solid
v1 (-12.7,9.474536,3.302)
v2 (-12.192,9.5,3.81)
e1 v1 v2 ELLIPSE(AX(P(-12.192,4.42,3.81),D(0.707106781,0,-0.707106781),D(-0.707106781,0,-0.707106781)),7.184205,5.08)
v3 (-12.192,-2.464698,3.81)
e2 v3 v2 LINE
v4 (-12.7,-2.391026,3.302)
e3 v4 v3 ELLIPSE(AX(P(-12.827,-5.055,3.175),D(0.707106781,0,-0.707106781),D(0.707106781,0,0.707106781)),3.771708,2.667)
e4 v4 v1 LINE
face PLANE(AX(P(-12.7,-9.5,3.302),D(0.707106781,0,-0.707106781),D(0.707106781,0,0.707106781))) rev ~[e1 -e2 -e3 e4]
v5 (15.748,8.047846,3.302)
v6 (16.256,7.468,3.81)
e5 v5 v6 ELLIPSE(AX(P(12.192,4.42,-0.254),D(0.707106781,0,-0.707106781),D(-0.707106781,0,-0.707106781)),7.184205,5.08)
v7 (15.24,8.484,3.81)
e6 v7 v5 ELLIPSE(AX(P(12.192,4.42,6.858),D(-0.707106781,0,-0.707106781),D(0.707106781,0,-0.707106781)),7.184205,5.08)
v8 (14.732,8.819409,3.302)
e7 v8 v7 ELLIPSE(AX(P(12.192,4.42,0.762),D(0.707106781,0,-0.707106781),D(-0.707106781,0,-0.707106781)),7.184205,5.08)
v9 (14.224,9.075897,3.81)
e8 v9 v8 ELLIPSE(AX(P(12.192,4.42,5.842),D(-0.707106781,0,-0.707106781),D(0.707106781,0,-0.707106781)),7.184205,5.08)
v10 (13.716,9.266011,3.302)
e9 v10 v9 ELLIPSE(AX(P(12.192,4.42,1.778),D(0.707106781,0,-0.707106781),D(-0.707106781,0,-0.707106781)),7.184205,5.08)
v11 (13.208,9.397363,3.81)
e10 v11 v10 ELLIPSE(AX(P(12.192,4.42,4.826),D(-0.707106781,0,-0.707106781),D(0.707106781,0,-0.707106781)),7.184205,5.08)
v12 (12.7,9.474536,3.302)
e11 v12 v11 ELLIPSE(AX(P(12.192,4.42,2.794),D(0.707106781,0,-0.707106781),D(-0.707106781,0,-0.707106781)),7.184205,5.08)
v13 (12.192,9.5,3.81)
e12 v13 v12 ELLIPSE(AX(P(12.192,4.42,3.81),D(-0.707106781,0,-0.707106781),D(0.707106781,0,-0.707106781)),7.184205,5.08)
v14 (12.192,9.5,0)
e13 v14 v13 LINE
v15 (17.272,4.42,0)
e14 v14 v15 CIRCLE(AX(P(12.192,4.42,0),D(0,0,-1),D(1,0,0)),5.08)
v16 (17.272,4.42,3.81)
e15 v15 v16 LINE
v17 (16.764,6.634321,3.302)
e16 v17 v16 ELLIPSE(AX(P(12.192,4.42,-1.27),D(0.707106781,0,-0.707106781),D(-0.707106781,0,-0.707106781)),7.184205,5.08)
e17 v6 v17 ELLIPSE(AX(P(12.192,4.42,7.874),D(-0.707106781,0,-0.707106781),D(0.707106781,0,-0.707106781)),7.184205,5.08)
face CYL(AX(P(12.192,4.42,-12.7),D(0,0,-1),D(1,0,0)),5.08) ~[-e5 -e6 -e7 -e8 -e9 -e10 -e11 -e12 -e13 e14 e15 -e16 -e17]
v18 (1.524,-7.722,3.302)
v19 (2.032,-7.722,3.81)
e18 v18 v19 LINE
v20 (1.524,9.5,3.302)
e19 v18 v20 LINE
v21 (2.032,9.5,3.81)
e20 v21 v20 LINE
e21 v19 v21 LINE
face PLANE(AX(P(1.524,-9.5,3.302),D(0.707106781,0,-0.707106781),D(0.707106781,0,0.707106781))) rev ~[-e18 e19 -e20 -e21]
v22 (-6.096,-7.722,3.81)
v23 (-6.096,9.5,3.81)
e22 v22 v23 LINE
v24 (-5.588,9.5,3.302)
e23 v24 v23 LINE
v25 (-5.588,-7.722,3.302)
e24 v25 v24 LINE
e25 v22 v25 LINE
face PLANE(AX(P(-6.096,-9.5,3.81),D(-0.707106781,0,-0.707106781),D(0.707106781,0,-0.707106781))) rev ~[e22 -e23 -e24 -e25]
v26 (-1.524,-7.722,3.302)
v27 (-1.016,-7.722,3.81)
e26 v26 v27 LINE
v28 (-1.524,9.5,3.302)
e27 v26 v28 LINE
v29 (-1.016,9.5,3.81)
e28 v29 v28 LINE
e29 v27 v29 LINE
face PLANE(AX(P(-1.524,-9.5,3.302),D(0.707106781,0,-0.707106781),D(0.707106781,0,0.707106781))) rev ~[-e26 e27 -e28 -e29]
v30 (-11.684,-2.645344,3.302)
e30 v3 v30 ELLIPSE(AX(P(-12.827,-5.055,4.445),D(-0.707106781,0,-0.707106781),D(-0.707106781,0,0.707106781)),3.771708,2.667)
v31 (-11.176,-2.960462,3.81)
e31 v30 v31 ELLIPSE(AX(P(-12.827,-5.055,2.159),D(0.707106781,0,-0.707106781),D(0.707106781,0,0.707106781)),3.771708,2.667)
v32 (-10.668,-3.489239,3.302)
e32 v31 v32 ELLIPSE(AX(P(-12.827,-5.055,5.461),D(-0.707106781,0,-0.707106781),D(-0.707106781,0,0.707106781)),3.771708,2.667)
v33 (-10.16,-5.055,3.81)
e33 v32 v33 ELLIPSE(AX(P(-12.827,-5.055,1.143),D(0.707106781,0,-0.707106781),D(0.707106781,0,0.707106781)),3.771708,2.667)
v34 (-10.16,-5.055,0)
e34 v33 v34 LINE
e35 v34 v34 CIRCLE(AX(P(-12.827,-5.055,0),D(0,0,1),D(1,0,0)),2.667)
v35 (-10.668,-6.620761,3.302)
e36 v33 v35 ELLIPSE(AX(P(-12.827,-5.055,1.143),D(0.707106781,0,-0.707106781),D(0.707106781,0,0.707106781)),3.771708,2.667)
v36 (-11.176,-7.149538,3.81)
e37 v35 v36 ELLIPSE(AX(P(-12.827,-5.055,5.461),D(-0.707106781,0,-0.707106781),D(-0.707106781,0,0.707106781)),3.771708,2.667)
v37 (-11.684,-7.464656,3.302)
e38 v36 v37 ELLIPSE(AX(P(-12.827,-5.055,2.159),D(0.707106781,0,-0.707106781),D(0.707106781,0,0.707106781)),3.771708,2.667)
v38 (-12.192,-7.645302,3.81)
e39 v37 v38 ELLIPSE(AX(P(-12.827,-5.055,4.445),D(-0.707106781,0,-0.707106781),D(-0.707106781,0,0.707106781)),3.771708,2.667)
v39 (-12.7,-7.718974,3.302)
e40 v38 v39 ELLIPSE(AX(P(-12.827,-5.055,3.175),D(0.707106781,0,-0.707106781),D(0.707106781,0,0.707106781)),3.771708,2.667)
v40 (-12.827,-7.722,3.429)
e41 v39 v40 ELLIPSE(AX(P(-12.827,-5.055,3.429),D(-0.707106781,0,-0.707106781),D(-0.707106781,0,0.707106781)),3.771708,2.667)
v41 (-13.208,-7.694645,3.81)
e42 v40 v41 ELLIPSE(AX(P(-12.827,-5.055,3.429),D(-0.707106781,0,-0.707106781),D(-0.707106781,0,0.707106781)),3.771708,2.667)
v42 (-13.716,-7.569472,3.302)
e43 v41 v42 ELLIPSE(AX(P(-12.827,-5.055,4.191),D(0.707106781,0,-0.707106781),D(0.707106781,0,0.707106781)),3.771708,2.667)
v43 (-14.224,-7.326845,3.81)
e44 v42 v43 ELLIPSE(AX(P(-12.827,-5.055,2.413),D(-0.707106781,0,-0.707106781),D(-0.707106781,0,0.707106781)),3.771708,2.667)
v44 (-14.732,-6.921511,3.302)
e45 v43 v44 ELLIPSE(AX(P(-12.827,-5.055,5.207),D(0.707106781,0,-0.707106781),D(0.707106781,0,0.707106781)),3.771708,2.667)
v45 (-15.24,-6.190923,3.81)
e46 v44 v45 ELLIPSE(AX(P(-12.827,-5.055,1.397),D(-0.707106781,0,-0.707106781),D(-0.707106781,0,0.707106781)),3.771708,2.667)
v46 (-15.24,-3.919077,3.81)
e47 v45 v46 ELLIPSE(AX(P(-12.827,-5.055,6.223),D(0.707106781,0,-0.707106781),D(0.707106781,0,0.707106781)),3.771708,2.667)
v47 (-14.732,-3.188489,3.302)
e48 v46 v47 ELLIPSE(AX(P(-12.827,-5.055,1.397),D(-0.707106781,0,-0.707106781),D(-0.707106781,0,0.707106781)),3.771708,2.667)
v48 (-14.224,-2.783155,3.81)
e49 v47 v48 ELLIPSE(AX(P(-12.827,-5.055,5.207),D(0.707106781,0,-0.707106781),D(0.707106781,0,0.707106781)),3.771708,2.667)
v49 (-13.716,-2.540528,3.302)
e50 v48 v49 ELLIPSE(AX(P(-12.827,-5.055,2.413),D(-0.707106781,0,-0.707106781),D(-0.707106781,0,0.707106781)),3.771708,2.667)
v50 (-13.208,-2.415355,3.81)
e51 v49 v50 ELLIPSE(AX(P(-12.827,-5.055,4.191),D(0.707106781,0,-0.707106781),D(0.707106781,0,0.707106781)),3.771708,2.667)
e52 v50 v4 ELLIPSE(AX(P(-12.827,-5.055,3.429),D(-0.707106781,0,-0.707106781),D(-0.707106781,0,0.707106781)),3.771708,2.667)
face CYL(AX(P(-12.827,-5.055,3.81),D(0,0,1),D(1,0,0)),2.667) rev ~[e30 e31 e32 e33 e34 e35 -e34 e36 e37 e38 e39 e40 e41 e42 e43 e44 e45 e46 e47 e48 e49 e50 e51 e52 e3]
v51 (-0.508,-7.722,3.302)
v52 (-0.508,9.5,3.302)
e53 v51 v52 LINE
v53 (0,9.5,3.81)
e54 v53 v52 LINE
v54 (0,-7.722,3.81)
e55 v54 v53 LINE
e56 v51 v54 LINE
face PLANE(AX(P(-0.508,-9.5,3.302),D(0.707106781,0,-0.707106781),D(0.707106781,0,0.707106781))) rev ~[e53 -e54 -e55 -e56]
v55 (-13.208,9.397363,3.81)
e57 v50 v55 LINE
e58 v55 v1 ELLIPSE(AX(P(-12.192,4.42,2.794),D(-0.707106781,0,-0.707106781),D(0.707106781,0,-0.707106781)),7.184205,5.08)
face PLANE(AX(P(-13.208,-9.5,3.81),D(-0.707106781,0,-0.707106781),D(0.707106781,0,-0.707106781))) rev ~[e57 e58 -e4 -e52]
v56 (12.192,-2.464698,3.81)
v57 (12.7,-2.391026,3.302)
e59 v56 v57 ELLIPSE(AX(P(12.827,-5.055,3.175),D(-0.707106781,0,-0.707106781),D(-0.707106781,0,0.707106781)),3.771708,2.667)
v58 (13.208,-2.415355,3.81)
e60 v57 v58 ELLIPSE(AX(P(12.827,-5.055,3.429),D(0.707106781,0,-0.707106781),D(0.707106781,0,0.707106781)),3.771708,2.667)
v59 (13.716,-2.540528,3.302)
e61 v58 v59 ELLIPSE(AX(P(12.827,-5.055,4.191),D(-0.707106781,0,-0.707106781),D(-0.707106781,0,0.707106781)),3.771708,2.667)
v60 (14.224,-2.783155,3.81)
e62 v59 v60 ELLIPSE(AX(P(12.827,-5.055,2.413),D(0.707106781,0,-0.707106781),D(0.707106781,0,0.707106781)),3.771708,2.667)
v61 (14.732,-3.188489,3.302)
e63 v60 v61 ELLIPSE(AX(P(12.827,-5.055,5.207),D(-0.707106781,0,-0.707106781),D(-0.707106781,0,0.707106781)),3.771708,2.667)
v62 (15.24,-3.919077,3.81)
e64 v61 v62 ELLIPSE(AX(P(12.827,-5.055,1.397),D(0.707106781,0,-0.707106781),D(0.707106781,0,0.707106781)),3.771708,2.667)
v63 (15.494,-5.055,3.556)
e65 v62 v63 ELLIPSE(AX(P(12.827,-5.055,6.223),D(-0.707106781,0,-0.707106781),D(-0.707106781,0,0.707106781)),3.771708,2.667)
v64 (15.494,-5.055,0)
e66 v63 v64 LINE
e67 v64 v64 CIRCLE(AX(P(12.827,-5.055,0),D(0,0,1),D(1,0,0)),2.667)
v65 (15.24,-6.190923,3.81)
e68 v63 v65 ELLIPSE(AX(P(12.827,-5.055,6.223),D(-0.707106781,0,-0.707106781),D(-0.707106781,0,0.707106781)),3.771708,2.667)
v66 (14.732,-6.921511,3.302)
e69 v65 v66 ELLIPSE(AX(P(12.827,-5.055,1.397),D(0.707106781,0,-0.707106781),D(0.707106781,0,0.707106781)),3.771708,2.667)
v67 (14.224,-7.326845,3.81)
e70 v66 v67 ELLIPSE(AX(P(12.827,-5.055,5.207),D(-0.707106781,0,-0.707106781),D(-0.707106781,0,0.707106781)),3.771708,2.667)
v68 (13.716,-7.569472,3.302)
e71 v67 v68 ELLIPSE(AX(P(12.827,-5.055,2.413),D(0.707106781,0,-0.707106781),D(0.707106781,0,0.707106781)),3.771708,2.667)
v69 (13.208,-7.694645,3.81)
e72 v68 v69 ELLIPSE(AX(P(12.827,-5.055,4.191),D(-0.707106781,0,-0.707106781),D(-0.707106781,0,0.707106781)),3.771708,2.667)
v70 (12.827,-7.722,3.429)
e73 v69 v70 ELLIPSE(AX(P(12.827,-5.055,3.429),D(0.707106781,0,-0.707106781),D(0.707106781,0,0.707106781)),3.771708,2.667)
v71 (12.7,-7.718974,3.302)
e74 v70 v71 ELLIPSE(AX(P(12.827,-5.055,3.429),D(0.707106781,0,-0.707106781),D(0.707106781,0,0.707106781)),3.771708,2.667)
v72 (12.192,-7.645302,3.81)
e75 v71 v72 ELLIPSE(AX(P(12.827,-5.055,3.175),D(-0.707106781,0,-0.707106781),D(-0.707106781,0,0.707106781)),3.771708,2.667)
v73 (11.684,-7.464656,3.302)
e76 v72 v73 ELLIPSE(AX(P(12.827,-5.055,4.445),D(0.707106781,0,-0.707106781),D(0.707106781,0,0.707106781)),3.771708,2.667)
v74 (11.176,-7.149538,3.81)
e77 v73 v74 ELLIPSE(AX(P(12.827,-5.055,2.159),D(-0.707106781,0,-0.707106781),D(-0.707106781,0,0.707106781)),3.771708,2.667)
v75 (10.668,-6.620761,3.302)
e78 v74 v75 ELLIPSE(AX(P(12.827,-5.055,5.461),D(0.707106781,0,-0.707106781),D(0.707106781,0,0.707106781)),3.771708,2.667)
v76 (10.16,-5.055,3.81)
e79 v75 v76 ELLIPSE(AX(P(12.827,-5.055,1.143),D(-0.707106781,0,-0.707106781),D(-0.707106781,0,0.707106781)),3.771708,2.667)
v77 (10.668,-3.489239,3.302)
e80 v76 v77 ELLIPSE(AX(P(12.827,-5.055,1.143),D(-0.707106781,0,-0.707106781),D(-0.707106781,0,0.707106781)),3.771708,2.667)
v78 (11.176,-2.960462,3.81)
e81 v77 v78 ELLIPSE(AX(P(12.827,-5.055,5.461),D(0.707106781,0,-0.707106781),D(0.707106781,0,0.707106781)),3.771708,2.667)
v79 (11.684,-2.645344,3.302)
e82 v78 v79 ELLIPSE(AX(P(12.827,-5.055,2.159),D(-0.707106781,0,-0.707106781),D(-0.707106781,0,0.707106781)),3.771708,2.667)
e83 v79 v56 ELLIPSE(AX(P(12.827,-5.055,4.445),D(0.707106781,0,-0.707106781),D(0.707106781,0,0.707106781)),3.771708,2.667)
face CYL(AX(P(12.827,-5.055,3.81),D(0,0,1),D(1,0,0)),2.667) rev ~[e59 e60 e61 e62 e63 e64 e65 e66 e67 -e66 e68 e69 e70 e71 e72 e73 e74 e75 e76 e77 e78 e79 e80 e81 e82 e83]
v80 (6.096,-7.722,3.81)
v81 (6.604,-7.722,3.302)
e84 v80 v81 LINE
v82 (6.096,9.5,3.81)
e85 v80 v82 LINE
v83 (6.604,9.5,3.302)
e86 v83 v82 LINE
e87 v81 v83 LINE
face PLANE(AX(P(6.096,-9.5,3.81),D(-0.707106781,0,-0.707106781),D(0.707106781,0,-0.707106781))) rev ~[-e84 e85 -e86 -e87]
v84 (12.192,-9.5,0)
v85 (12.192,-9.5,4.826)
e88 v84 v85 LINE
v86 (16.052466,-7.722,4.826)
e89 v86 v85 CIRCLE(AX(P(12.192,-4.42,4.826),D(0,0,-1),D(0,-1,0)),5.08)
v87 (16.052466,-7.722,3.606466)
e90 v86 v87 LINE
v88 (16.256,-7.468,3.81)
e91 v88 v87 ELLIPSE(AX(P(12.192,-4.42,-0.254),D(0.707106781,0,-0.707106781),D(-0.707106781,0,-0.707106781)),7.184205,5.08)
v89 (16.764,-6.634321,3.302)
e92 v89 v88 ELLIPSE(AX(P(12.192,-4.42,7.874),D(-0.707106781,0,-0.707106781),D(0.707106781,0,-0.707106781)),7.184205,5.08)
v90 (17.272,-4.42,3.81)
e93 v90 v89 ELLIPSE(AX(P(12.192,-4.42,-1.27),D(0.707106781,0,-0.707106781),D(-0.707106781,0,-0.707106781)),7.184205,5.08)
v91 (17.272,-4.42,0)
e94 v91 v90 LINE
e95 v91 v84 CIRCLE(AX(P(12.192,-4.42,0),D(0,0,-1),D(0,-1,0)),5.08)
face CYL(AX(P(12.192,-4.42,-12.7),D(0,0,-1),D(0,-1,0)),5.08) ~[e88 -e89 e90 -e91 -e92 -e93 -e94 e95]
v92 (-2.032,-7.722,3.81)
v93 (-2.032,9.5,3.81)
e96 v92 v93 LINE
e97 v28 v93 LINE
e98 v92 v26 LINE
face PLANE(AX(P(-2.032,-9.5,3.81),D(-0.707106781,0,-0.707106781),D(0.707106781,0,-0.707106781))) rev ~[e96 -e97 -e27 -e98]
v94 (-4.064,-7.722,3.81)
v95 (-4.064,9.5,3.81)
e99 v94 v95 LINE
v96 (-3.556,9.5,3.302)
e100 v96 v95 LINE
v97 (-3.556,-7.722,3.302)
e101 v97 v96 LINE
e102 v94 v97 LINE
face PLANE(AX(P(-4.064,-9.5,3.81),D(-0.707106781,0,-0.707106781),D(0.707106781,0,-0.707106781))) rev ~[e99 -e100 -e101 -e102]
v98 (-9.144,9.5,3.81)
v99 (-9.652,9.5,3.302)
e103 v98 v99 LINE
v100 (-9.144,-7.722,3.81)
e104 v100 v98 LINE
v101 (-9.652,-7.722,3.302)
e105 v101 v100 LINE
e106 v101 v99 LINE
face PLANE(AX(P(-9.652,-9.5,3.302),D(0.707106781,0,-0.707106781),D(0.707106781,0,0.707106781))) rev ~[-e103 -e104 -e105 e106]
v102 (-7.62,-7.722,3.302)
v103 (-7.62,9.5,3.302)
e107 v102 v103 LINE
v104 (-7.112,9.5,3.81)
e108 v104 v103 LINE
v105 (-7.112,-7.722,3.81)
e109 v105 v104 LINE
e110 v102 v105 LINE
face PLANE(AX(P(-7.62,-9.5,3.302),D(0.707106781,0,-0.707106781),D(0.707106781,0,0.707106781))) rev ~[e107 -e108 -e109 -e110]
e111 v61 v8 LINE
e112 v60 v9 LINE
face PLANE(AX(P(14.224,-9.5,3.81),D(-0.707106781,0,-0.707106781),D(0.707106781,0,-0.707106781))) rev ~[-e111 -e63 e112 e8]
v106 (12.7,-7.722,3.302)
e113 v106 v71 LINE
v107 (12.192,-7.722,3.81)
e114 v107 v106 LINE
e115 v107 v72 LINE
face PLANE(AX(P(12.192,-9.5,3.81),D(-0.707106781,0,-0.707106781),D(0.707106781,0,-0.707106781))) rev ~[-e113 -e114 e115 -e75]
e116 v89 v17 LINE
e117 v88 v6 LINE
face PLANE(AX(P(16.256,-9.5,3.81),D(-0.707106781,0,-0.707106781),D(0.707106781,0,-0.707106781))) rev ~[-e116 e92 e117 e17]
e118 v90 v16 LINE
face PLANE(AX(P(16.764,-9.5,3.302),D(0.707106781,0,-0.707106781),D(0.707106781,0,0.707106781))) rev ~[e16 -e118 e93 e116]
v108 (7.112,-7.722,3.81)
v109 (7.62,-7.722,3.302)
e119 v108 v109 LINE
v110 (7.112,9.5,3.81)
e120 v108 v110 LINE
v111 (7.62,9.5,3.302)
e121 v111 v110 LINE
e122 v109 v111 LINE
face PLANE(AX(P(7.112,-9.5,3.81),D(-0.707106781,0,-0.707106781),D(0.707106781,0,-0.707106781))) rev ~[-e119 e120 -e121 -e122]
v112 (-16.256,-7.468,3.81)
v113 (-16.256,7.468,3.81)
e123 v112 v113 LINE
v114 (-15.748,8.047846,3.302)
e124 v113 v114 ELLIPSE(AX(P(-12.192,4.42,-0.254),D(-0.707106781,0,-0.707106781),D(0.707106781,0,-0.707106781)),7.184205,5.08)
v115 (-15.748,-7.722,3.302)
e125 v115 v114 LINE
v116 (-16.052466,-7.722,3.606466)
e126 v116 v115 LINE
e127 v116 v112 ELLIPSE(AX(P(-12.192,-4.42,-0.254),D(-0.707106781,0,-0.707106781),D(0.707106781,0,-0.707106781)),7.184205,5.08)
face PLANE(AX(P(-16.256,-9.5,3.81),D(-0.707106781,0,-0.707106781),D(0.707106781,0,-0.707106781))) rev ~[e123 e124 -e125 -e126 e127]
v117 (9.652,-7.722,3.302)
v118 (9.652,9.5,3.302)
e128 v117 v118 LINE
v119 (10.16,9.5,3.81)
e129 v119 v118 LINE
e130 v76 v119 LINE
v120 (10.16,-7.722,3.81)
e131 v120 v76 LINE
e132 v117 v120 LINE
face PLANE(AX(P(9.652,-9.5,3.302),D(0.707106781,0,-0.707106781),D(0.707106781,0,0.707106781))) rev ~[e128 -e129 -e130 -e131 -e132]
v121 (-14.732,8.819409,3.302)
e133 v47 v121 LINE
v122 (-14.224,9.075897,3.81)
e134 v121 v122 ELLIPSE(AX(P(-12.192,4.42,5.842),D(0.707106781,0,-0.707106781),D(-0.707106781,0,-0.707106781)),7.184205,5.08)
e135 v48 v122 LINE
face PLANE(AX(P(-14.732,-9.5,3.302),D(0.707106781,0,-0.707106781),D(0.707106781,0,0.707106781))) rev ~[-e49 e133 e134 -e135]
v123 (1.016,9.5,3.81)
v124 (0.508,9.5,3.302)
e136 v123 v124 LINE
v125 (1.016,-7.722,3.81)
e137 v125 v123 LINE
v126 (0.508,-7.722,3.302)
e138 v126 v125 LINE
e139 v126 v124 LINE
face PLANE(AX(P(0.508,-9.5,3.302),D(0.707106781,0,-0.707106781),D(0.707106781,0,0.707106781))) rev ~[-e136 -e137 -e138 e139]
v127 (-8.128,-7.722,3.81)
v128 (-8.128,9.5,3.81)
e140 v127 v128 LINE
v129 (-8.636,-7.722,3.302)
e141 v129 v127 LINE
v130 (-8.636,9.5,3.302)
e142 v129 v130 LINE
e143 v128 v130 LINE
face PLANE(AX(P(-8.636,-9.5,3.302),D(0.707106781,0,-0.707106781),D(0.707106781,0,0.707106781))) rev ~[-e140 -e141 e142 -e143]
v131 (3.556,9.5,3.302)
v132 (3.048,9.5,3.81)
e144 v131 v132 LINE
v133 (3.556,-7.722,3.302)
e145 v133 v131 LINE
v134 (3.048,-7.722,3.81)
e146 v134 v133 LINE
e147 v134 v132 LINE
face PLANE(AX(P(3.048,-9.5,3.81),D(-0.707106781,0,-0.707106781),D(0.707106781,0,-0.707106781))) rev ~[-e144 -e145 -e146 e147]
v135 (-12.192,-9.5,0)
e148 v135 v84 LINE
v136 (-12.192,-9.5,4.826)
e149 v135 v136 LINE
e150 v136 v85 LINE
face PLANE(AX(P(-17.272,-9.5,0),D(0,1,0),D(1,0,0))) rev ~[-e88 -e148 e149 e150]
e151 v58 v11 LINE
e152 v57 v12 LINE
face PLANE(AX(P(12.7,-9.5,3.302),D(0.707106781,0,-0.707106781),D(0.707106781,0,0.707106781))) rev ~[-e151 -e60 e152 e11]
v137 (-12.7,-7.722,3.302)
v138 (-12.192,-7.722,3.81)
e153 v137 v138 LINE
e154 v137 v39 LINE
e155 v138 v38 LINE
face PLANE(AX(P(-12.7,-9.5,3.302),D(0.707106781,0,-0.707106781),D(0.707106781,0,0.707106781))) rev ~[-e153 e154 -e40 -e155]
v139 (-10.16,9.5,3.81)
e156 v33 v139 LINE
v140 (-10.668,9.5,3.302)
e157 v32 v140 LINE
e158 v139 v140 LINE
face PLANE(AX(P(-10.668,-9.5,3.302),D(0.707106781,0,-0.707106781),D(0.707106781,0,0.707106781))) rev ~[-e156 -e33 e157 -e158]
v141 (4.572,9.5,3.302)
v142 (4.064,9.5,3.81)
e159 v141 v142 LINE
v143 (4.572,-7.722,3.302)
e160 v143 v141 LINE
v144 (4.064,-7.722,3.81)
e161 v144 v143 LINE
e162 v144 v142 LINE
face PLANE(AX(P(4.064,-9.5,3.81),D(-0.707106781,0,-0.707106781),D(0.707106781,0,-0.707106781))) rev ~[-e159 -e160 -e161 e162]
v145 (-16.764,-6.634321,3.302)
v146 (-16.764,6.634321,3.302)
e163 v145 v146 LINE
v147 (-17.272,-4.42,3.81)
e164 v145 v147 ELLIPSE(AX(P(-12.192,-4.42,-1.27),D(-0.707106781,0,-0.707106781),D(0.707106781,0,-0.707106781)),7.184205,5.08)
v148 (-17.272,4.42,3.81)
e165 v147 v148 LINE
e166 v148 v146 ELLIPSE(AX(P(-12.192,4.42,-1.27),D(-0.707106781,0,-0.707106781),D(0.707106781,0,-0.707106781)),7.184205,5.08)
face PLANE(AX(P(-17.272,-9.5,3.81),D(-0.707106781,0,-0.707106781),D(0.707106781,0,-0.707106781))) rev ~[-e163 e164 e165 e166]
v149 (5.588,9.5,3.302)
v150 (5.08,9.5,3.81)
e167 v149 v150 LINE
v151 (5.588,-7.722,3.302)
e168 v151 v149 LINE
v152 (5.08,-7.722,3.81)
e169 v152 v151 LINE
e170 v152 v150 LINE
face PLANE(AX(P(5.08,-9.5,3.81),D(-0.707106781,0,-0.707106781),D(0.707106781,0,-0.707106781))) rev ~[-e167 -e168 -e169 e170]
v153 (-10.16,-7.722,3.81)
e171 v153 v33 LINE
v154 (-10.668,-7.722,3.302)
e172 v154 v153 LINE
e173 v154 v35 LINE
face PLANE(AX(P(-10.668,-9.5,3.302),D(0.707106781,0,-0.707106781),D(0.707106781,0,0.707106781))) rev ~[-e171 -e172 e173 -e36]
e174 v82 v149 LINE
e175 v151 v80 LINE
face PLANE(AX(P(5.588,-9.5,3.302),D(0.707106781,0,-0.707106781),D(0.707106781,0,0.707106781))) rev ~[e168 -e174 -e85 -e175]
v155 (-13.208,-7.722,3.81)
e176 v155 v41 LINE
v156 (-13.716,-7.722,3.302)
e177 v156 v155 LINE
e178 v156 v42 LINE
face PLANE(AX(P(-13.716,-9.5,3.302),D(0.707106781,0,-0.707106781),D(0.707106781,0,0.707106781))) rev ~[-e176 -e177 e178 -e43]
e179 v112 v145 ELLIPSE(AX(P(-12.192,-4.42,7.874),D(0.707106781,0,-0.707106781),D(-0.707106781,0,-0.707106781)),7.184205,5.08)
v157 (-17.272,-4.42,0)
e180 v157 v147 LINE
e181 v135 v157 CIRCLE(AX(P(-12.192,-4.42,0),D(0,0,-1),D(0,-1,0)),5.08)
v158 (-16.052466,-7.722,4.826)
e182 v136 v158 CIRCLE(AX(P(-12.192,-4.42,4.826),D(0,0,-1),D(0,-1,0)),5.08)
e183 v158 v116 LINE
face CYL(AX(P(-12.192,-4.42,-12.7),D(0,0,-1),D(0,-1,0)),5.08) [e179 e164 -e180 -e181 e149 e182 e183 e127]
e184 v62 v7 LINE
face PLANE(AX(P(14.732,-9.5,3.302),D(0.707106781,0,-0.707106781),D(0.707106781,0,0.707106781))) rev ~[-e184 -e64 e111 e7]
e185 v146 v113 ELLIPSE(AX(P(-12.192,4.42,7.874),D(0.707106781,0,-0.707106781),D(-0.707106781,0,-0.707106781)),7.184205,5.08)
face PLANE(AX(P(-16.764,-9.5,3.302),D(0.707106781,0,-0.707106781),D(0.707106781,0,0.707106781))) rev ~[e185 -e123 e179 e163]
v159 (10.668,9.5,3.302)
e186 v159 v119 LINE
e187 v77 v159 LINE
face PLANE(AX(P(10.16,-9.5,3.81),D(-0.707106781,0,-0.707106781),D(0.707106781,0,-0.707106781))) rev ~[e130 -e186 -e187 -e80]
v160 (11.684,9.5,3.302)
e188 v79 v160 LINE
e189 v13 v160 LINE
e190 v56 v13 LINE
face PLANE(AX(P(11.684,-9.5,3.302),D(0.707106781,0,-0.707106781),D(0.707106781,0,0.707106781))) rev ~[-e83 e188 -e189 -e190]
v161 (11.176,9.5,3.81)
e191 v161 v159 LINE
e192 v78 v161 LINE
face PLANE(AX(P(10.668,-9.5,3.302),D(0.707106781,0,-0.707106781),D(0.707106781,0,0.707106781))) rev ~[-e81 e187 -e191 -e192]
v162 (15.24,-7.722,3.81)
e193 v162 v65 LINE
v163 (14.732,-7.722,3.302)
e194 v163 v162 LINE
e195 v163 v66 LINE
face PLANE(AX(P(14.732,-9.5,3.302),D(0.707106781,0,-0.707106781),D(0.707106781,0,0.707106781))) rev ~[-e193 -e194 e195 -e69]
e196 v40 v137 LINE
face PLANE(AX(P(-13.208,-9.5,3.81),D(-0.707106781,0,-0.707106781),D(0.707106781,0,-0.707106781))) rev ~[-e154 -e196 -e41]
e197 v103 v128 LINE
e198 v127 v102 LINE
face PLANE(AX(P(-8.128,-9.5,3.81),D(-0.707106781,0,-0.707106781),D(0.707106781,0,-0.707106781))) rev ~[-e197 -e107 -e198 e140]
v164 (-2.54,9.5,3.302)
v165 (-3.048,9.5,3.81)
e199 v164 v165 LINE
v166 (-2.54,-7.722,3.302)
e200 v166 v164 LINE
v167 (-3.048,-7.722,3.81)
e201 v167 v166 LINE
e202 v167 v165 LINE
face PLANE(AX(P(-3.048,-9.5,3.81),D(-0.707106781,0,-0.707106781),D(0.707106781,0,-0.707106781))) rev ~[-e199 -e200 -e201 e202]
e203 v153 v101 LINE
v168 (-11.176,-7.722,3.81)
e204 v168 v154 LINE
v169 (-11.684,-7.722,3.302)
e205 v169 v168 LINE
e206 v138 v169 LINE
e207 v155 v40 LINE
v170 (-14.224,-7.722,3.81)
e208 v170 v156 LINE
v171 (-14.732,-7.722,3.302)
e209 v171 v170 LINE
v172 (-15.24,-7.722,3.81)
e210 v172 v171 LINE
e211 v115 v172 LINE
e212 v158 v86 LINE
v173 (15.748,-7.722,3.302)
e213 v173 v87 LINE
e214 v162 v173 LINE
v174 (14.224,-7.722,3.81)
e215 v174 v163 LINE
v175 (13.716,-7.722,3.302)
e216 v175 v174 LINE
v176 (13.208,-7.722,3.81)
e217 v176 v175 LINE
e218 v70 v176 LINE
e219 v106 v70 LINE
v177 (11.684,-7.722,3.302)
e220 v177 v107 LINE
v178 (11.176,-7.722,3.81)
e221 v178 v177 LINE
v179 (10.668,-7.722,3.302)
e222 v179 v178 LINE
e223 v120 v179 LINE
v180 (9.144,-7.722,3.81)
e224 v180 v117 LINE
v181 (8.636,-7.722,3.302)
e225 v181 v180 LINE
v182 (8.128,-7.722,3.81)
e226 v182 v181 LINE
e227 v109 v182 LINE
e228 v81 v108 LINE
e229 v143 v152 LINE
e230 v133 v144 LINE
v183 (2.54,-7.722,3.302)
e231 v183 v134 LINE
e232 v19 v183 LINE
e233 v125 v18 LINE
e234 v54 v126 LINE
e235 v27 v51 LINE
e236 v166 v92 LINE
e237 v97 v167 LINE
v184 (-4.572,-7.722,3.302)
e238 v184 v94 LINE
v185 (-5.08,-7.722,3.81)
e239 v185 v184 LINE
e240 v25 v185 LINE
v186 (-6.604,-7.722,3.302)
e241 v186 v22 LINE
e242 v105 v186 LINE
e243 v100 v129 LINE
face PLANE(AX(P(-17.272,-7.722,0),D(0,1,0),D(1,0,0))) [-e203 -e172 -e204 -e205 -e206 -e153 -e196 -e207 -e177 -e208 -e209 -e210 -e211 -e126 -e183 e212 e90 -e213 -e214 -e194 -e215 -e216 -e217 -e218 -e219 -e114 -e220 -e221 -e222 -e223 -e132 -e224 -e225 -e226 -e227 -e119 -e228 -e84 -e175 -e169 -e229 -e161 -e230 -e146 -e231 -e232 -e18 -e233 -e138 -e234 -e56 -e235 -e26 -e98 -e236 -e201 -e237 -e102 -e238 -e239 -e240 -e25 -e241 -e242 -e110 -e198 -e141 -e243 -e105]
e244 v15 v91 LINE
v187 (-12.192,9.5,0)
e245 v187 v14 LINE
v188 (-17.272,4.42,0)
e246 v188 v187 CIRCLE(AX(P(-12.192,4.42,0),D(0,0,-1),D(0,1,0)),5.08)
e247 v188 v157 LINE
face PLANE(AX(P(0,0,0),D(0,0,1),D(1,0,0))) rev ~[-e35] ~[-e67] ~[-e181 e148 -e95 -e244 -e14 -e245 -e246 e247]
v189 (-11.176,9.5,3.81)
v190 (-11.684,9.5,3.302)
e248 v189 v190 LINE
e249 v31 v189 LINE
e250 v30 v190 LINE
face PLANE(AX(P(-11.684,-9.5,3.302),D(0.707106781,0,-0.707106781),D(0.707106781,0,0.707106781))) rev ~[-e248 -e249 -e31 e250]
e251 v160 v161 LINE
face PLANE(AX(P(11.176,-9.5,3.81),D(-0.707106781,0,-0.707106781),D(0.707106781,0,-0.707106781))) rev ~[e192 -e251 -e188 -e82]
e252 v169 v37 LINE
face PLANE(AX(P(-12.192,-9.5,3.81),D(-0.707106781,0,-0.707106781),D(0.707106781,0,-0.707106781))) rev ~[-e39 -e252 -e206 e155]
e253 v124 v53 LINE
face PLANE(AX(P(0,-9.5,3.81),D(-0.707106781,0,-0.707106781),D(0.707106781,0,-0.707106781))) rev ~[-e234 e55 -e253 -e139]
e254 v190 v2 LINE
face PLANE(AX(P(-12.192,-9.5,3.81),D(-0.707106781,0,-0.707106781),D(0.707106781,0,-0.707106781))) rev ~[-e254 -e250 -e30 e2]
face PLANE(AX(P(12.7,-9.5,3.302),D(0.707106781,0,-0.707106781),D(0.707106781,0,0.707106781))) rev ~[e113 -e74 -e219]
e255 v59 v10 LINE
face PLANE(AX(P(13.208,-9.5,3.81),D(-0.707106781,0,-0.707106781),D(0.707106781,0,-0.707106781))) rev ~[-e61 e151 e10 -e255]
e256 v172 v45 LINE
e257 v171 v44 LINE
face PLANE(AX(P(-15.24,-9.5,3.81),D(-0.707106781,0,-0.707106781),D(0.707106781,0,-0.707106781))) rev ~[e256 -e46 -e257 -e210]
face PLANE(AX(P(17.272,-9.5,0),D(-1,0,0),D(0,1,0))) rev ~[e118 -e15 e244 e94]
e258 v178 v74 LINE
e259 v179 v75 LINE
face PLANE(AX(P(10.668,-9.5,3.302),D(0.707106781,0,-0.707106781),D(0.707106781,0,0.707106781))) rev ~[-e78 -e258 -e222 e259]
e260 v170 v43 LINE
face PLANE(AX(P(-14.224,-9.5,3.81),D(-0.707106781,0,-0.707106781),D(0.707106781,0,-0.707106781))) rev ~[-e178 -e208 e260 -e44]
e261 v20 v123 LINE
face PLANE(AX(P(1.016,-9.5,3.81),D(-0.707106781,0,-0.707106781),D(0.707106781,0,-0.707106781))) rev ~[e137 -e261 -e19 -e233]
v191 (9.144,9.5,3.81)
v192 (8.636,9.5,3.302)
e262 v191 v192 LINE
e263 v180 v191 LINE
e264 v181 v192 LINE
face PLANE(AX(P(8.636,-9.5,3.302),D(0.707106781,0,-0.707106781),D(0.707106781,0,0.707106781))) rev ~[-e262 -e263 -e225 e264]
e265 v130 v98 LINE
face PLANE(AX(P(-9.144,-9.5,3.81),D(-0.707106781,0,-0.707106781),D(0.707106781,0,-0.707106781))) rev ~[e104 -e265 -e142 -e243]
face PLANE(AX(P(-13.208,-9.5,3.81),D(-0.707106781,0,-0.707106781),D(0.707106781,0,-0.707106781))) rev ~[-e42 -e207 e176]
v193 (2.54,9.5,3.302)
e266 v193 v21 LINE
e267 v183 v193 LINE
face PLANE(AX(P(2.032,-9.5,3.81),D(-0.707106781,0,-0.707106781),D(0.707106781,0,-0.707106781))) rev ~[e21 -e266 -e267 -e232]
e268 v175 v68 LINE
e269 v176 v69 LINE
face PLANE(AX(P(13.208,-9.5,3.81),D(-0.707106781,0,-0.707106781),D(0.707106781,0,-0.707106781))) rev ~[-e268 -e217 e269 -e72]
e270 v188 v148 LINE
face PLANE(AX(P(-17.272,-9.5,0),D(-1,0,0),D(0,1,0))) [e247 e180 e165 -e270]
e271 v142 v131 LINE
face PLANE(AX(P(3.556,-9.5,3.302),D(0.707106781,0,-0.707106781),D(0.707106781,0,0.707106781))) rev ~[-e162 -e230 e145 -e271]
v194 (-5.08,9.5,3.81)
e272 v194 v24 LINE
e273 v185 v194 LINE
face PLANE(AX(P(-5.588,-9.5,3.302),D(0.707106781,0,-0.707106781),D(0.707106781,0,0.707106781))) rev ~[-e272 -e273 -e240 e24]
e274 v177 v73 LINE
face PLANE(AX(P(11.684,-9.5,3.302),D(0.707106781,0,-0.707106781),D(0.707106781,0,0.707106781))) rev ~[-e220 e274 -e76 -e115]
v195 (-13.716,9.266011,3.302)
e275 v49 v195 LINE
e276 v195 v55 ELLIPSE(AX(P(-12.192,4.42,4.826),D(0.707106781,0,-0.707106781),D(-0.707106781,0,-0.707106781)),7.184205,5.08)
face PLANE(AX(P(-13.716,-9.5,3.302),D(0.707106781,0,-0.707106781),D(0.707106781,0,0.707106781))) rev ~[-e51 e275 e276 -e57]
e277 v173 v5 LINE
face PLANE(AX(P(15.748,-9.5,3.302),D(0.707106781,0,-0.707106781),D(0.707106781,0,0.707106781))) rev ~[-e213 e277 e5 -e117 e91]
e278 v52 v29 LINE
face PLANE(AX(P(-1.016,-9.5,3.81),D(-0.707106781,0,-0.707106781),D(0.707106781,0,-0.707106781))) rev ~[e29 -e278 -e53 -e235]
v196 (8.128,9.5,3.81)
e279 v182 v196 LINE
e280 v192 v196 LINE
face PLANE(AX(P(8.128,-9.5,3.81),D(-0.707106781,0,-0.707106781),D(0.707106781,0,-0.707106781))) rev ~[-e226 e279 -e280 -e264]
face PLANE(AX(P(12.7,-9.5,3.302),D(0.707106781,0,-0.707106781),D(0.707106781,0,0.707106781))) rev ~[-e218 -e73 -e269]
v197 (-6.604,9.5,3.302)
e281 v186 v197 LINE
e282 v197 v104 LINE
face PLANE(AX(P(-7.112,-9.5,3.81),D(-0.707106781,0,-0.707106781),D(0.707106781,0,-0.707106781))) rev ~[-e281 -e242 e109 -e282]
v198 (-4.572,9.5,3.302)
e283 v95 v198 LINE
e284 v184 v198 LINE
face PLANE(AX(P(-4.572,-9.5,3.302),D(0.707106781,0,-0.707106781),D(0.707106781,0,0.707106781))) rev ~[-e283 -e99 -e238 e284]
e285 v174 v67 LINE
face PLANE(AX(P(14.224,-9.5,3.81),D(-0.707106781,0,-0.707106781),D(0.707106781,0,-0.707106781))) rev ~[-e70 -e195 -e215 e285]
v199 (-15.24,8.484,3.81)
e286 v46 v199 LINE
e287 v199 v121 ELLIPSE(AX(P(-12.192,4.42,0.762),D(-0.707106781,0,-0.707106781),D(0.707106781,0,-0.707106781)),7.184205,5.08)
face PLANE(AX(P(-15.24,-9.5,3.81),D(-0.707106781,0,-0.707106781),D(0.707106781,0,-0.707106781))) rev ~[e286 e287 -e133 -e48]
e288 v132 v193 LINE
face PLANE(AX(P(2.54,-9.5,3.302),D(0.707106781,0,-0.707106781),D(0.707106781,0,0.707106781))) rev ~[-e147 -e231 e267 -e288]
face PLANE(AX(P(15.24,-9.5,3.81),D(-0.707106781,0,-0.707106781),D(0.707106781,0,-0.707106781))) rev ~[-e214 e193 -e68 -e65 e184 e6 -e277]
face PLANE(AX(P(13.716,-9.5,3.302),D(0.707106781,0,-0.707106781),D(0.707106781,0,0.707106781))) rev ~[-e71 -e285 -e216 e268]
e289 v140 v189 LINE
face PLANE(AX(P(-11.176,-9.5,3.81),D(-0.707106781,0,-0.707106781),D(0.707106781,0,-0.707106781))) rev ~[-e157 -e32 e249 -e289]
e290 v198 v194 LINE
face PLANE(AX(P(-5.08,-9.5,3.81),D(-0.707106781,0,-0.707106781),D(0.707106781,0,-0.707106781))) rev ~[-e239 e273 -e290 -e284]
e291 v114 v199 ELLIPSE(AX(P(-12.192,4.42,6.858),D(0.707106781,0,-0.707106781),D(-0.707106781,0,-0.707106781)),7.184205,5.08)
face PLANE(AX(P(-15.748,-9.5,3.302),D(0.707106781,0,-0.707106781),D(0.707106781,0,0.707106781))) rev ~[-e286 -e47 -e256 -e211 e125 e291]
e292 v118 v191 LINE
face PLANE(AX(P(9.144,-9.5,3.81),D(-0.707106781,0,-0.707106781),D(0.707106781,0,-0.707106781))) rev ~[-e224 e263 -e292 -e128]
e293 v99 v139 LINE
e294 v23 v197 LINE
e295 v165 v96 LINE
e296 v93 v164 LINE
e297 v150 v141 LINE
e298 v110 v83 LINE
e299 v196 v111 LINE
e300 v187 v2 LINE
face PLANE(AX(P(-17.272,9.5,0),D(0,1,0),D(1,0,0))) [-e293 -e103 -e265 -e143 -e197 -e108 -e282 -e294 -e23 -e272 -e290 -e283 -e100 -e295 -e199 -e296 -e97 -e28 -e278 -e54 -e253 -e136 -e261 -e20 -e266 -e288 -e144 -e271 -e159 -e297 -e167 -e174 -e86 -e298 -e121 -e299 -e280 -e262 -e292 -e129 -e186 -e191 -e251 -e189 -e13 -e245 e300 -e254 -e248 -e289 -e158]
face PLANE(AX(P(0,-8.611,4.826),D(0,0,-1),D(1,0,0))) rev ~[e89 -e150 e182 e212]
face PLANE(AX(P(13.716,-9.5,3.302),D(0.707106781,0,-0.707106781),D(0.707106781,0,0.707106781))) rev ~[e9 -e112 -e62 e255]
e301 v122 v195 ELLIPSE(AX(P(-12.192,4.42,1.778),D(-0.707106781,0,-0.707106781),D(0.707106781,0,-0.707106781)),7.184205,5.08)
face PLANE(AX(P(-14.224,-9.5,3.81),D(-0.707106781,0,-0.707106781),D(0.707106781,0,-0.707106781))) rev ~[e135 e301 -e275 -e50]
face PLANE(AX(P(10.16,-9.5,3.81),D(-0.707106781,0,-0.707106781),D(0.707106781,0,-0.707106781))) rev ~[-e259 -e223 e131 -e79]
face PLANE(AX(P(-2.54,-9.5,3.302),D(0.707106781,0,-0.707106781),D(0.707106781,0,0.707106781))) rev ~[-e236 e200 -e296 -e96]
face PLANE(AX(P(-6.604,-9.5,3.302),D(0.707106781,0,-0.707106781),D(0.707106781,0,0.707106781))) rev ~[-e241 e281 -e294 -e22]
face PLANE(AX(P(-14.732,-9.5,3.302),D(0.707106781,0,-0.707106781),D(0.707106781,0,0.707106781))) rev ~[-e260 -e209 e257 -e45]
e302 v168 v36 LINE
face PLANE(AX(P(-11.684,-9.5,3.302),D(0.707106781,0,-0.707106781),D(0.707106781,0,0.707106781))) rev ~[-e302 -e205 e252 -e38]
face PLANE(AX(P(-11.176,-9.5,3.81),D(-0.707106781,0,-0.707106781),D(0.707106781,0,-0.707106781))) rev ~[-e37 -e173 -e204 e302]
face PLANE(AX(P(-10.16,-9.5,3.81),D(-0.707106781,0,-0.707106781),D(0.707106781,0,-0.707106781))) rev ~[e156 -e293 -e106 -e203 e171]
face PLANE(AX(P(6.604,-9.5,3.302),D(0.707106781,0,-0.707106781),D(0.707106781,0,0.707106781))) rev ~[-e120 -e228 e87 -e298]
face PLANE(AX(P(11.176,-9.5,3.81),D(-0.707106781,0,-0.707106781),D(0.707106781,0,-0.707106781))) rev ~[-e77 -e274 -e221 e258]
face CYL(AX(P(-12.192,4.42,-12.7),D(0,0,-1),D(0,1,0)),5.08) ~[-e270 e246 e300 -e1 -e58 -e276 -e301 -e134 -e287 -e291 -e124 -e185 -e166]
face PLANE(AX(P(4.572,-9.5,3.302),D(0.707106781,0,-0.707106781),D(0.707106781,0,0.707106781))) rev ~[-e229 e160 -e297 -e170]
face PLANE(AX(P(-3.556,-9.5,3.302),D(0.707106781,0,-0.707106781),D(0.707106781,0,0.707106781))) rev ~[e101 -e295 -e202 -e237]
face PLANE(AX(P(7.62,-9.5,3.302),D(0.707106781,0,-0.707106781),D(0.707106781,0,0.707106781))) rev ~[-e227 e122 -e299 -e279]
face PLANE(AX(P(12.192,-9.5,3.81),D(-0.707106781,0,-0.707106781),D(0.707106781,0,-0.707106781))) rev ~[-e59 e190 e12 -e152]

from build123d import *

# Parameters (mm, degrees)
F0_W        = 34.544
F0_H        = 19
F1_DEPTH    = 3.81
F3_R        = 2.667
F4_DEPTH    = 10.16
F6_DEPTH    = 19.001
F7_W        = 34.544
F7_H        = 1.778
F8_DEPTH    = 4.826
F9_T1_DEPTH = 30.226
F9_T3_DEPTH = 29.21


# Not quite as in the source:
# - a fillet or chamfer that OpenCascade refuses, or shapes differently, is made with other operations: its cross-section is extruded or revolved along the edge and cut away or added


with BuildPart() as f1:
    # F0 (on Top) → F1 (new body)
    with BuildSketch(Plane.XY):
        Rectangle(F0_W, F0_H)
    extrude(amount=F1_DEPTH)

    # F3 (on face) → F4 (cut)
    with BuildSketch(Plane.XY.offset(3.81)):
        with Locations((-12.827, -5.055)):
            Circle(F3_R)
        with Locations((12.827, -5.055)):
            Circle(F3_R)
    extrude(amount=-F4_DEPTH, mode=Mode.SUBTRACT)

    # F5 (on face) → F6 (cut, through all)
    with BuildSketch(Plane.XZ.offset(9.5)):
        Polygon((-17.78, 3.302), (-17.272, 3.81), (-18.288, 3.81), align=None)
        Polygon((-16.764, 3.302), (-16.256, 3.81), (-17.272, 3.81), align=None)
        Polygon((-15.748, 3.302), (-15.24, 3.81), (-16.256, 3.81), align=None)
        Polygon((-14.732, 3.302), (-14.224, 3.81), (-15.24, 3.81), align=None)
        Polygon((-13.716, 3.302), (-13.208, 3.81), (-14.224, 3.81), align=None)
        Polygon((-12.7, 3.302), (-12.192, 3.81), (-13.208, 3.81), align=None)
        Polygon((-11.684, 3.302), (-11.176, 3.81), (-12.192, 3.81), align=None)
        Polygon((-10.668, 3.302), (-10.16, 3.81), (-11.176, 3.81), align=None)
        Polygon((-9.652, 3.302), (-9.144, 3.81), (-10.16, 3.81), align=None)
        Polygon((-8.636, 3.302), (-8.128, 3.81), (-9.144, 3.81), align=None)
        Polygon((-7.62, 3.302), (-7.112, 3.81), (-8.128, 3.81), align=None)
        Polygon((-6.604, 3.302), (-6.096, 3.81), (-7.112, 3.81), align=None)
        Polygon((-5.588, 3.302), (-5.08, 3.81), (-6.096, 3.81), align=None)
        Polygon((-4.572, 3.302), (-4.064, 3.81), (-5.08, 3.81), align=None)
        Polygon((-3.556, 3.302), (-3.048, 3.81), (-4.064, 3.81), align=None)
        Polygon((-2.54, 3.302), (-2.032, 3.81), (-3.048, 3.81), align=None)
        Polygon((-1.524, 3.302), (-1.016, 3.81), (-2.032, 3.81), align=None)
        Polygon((-0.508, 3.302), (0, 3.81), (-1.016, 3.81), align=None)
        Polygon((0.508, 3.302), (1.016, 3.81), (0, 3.81), align=None)
        Polygon((1.524, 3.302), (2.032, 3.81), (1.016, 3.81), align=None)
        Polygon((2.54, 3.302), (3.048, 3.81), (2.032, 3.81), align=None)
        Polygon((3.556, 3.302), (4.064, 3.81), (3.048, 3.81), align=None)
        Polygon((4.572, 3.302), (5.08, 3.81), (4.064, 3.81), align=None)
        Polygon((5.588, 3.302), (6.096, 3.81), (5.08, 3.81), align=None)
        Polygon((6.604, 3.302), (7.112, 3.81), (6.096, 3.81), align=None)
        Polygon((7.62, 3.302), (8.128, 3.81), (7.112, 3.81), align=None)
        Polygon((8.636, 3.302), (9.144, 3.81), (8.128, 3.81), align=None)
        Polygon((9.652, 3.302), (10.16, 3.81), (9.144, 3.81), align=None)
        Polygon((10.668, 3.302), (11.176, 3.81), (10.16, 3.81), align=None)
        Polygon((11.684, 3.302), (12.192, 3.81), (11.176, 3.81), align=None)
        Polygon((12.7, 3.302), (13.208, 3.81), (12.192, 3.81), align=None)
        Polygon((13.716, 3.302), (14.224, 3.81), (13.208, 3.81), align=None)
        Polygon((14.732, 3.302), (15.24, 3.81), (14.224, 3.81), align=None)
        Polygon((15.748, 3.302), (16.256, 3.81), (15.24, 3.81), align=None)
        Polygon((16.764, 3.302), (17.272, 3.81), (16.256, 3.81), align=None)
    extrude(amount=-F6_DEPTH, mode=Mode.SUBTRACT)

    # F7 (on face) → F8 (join)
    with BuildSketch(Plane(origin=(0, 0, 0), x_dir=(1, 0, 0), z_dir=(0, 0, -1))):
        with Locations((0, 8.611)):
            Rectangle(F7_W, F7_H)
    extrude(amount=-F8_DEPTH)

    # F9: fillet of radius 5.08 on 4 edges, made by hand

    # F9_s2 → F9_t1 (cut)
    with BuildSketch(Plane.XY.offset(-12.7)):
        with BuildLine():
            ThreePointArc((12.192, -9.5), (15.7841024484, -8.0121024484), (17.272, -4.42))
            Line((17.272, -4.42), (17.272, -9.5))
            Line((17.272, -9.5), (12.192, -9.5))
        make_face()
        with BuildLine():
            ThreePointArc((-12.192, -9.5), (-15.7841024484, -8.0121024484), (-17.272, -4.42))
            Line((-17.272, -4.42), (-17.272, -9.5))
            Line((-17.272, -9.5), (-12.192, -9.5))
        make_face()
    extrude(amount=F9_T1_DEPTH, mode=Mode.SUBTRACT)

    # F9_s4 → F9_t3 (cut)
    with BuildSketch(Plane.XY.offset(-12.7)):
        with BuildLine():
            ThreePointArc((17.272, 4.42), (15.7841024484, 8.0121024484), (12.192, 9.5))
            Line((12.192, 9.5), (17.272, 9.5))
            Line((17.272, 9.5), (17.272, 4.42))
        make_face()
        with BuildLine():
            ThreePointArc((-12.192, 9.5), (-15.7841024484, 8.0121024484), (-17.272, 4.42))
            Line((-17.272, 4.42), (-17.272, 9.5))
            Line((-17.272, 9.5), (-12.192, 9.5))
        make_face()
    extrude(amount=F9_T3_DEPTH, mode=Mode.SUBTRACT)


solid = f1.part
